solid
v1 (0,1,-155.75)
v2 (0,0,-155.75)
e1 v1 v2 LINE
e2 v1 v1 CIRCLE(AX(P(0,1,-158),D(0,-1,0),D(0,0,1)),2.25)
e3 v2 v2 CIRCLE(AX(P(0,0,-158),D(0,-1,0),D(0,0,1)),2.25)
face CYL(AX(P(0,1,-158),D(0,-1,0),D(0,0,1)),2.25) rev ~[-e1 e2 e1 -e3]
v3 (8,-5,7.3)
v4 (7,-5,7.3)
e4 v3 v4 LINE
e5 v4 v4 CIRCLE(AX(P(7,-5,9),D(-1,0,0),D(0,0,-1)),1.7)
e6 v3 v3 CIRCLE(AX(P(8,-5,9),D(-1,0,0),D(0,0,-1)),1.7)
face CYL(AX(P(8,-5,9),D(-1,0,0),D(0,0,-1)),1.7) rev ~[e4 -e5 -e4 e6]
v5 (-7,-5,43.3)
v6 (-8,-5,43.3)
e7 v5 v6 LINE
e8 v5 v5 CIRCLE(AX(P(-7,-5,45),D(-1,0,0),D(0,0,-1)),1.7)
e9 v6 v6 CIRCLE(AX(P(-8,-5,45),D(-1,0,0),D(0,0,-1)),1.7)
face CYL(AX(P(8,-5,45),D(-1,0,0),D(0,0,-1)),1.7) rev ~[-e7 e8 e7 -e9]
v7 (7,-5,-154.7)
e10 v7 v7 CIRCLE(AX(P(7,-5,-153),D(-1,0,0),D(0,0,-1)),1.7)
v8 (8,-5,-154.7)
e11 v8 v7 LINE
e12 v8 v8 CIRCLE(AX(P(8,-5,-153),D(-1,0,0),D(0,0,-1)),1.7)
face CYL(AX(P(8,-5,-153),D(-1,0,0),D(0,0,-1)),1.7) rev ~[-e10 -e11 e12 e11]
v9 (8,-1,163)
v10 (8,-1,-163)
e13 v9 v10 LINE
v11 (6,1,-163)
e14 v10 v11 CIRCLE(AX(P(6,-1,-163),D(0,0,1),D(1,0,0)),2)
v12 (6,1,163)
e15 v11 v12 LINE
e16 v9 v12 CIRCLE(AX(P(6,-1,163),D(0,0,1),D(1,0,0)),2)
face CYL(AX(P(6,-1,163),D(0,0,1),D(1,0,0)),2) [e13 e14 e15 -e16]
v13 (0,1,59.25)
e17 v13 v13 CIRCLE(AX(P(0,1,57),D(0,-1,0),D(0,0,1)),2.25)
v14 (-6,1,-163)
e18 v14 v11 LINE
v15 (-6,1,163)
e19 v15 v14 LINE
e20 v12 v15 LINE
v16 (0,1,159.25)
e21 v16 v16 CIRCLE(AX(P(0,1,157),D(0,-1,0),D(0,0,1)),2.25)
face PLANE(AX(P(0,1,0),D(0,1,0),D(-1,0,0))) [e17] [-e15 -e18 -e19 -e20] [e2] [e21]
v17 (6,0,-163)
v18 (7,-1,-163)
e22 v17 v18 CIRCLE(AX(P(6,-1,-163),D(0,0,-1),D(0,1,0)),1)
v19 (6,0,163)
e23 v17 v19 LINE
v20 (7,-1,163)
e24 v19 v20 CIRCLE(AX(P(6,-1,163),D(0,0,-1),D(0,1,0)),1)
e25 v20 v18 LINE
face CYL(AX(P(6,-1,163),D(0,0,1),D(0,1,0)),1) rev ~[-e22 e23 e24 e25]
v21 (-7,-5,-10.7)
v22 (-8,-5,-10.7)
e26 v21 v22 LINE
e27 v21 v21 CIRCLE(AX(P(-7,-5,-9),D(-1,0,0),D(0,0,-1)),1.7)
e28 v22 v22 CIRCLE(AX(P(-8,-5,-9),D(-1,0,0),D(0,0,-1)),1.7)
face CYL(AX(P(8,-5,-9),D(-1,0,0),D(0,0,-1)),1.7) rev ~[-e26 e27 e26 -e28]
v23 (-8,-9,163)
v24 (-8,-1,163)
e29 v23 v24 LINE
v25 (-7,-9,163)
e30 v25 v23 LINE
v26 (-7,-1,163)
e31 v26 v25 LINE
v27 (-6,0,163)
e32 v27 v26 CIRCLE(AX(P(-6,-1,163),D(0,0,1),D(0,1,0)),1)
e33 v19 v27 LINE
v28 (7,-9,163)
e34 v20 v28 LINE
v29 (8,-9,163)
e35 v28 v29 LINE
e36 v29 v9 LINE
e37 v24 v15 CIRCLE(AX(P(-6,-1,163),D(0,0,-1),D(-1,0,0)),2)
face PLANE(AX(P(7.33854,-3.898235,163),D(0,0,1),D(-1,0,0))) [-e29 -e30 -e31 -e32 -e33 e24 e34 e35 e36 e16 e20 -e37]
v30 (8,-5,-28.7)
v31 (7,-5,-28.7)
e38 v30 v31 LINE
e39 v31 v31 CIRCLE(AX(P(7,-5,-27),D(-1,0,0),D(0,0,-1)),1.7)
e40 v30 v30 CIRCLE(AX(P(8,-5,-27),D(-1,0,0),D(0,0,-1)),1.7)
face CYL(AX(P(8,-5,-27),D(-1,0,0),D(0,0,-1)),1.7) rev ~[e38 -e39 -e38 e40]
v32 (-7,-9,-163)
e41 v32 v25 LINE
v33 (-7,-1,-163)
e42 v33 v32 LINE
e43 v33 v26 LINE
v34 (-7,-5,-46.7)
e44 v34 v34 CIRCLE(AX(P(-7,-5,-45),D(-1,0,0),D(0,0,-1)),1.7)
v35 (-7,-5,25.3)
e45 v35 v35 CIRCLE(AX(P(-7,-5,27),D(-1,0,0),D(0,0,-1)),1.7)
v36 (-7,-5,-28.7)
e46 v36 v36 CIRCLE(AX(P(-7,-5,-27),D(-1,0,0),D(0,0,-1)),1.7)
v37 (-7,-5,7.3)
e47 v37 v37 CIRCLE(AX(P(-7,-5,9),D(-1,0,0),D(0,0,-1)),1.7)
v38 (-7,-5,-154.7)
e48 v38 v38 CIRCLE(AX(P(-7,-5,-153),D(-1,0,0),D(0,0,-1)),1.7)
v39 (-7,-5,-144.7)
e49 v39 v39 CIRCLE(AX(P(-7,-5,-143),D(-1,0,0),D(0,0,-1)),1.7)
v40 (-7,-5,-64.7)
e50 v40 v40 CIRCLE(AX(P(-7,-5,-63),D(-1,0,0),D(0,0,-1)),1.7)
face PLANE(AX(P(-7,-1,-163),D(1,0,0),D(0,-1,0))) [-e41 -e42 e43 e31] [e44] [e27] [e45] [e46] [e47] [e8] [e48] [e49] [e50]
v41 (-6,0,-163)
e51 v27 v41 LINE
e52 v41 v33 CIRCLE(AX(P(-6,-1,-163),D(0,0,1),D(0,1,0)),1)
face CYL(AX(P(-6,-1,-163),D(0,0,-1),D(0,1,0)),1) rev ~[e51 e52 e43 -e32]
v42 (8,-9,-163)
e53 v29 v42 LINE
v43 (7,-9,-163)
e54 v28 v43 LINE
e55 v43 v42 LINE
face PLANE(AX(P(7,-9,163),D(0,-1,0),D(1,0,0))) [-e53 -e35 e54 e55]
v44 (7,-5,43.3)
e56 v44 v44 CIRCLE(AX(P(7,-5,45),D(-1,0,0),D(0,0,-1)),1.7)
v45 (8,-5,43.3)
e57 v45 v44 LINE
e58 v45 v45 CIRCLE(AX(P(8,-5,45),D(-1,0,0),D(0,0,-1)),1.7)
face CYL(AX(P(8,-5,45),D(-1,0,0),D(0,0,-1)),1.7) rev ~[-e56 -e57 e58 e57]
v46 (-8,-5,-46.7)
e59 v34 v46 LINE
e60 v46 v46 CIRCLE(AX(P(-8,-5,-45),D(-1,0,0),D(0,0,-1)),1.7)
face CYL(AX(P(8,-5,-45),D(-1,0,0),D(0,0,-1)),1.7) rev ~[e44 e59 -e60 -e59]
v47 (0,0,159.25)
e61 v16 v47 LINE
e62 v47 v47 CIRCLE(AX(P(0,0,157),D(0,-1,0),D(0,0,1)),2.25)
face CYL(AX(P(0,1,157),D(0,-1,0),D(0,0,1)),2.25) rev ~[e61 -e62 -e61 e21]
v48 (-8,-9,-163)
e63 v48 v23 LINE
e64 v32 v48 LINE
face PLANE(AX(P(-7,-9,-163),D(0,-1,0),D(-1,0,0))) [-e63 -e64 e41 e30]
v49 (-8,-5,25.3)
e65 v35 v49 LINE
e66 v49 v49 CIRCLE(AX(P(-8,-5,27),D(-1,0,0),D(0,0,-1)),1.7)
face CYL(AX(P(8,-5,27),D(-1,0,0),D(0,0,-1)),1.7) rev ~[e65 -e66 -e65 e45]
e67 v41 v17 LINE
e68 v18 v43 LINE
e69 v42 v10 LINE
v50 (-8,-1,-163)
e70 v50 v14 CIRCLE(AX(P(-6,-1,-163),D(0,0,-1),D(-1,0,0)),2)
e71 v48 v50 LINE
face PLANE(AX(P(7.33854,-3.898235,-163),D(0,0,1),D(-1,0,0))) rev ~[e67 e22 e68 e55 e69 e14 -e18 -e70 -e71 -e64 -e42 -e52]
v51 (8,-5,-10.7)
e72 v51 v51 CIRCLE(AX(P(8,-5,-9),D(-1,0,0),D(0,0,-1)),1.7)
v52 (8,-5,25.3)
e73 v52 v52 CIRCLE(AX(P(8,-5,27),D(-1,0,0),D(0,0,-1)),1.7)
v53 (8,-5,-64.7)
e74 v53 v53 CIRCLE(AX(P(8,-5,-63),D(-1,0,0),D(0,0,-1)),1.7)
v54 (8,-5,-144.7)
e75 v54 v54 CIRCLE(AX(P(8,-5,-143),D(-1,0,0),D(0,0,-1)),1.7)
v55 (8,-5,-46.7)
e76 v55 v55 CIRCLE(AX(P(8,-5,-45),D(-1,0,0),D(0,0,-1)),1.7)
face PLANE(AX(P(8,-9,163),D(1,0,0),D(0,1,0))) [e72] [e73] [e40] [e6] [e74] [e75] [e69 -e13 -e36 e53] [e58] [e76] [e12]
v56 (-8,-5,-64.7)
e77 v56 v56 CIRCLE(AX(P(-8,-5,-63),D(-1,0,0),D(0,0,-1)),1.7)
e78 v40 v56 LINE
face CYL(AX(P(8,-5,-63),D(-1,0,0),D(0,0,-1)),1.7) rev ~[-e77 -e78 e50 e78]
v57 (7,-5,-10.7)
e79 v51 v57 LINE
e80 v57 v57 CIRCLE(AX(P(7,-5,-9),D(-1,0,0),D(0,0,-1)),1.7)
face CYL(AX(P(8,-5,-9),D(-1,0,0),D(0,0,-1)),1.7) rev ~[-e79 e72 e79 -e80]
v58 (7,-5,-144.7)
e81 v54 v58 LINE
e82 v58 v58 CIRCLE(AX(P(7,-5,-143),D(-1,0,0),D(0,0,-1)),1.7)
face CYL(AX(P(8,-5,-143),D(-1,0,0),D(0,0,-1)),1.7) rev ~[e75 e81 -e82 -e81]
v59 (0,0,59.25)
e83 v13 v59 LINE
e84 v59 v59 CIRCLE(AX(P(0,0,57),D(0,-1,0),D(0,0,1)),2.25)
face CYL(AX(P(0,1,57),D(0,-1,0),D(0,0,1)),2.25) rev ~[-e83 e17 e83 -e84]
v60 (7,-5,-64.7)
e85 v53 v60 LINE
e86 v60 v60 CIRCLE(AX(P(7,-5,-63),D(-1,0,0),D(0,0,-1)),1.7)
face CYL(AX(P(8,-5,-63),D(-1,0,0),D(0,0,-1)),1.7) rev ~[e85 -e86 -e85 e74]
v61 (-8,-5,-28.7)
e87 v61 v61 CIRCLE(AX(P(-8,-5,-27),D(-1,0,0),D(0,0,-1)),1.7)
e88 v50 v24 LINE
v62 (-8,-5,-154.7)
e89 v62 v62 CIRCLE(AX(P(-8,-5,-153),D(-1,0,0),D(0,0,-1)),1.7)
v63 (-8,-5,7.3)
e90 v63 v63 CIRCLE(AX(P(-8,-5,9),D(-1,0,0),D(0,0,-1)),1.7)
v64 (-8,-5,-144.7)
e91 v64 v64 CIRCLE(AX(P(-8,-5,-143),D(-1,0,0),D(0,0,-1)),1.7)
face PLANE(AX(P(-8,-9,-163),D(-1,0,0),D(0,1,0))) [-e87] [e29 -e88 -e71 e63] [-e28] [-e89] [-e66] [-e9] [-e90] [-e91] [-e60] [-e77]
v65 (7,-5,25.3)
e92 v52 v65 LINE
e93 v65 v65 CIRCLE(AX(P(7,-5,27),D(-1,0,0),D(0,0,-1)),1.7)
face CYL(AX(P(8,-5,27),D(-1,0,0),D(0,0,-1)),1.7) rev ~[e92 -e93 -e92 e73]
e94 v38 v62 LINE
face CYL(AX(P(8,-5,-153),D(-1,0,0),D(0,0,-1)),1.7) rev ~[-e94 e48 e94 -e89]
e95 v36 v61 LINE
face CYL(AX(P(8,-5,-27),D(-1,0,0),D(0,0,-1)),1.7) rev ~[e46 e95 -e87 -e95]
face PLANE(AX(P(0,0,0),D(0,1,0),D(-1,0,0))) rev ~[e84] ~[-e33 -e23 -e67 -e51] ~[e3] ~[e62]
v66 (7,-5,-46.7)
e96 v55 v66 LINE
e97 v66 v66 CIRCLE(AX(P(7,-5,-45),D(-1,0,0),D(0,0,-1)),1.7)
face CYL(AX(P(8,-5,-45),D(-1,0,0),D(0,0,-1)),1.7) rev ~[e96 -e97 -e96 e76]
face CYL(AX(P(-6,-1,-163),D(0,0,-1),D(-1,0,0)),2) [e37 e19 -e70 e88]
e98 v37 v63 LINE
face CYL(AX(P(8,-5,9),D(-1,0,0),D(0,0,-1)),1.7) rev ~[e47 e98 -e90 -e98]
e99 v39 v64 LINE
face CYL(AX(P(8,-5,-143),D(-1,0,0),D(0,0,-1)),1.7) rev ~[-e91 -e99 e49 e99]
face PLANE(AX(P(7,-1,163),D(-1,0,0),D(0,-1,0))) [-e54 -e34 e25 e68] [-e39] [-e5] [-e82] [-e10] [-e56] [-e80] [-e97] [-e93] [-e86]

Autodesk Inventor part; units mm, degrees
ref_plane "YZ Plane" through (0, 0, 0) normal (1, 0, 0) x (0, 1, 0)
ref_plane "XZ Plane" through (0, 0, 0) normal (0, 1, 0) x (-1, 0, 0)
ref_plane "XY Plane" through (0, 0, 0) normal (0, 0, 1) x (1, 0, 0)
sketch "Esquisse4" plane through (0, 0, 0) normal (0, 1, 0) x (-1, 0, 0)
  line L0 (-8, 163) -> (8, 163)
  line L1 (8, 163) -> (8, -163)
  line L2 (8, -163) -> (-8, -163)
  line L3 (-8, -163) -> (-8, 163)
  line L4 (-8, 163) -> (8, -163) construction
  line L5 (8, 163) -> (-8, -163) construction
  point P0 (0, 0)
  dimension "d26" = 16
  dimension "d27" = 326
extrude "Plaque3" add sketch "Esquisse4" along normal blind 1
sketch "Esquisse5" plane through (7, 1, 163) normal (1, 0, 0) x (0, 1, 0)
  line L0 (0, -326) -> (0, 0)
  line L1 (0, 0) -> (-10, 0)
  line L2 (-10, 0) -> (-10, -326)
  line L3 (-10, -326) -> (0, -326)
edge flange "Bord tombé2" height 10 angle 90 thickness 1 bend radius 1 thickness toward (1, 0, 0) relief tear relief width 1 relief depth 0.5 corner gap 1 corner form 0 edges at (8, 0, 0) (-8, 0, 0) wall of the first edge with corners at (7, 1, -163) (7, 1, 163) (7, -9, 163) (7, -9, -163)
bend "Pli2"
corner "Coin2"
sketch "Esquisse6" plane through (0, 1, 0) normal (0, 1, 0) x (1, 0, 0)
  line L0 (-6, 163) -> (6, 163) projected
  point P0 (0, 0)
  point P1 (0, 158)
  point P2 (0, 163)
  dimension "d39" = 5
hole "Perçage2" at (0, 1, -158) direction (0, -1, 0) diameter 4.5 depth 1 clearance for "Vis d'assemblage à six pans creux ISO 4762" size "M4" standard "ISO"
sketch "Esquisse7" plane through (0, 1, 0) normal (0, 1, 0) x (1, 0, 0)
  line L0 (-6, 163) -> (6, 163) projected
  point P0 (0, 0)
  point P1 (0, -57)
  point P2 (0, -157)
  dimension "d50" = 220
  dimension "d51" = 100
hole "Perçage3" at (0, 1, 57) at (0, 1, 157) direction (0, -1, 0) diameter 4.5 depth 1 clearance for "Vis d'assemblage à six pans creux ISO 4762" size "M4" standard "ISO"
sketch "Esquisse8" plane through (8, -9, 163) normal (1, 0, 0) x (0, 0, -1)
  line L0 (326, 8) -> (0, 8) projected
  line L1 (0, 0) -> (0, 8) projected
  line L2 (326, 0) -> (0, 0) projected
  line L3 (326, 8) -> (326, 0) projected
  line L4 (326, 8) -> (326, 0) projected
  point P0 (163, 9)
  point P1 (326, 4)
  point P2 (326, 4)
  point P3 (316, 4)
  point P4 (326, 4)
  point P5 (306, 4)
  dimension "d60" = 10
  dimension "d71" = 10
hole "Perçage4" at (8, -5, -153) at (8, -5, -143) direction (-1, 0, 0) diameter 3.4 depth 16 clearance for "Vis d'assemblage à six pans creux ISO 4762" size "M3" standard "ISO"
sketch "Esquisse9" plane through (8, -9, 163) normal (1, 0, 0) x (0, 0, -1)
  line L0 (326, 8) -> (326, 0) projected
  point P0 (163, 9)
  point P1 (226, 4)
  point P2 (326, 4)
  dimension "d72" = 100
hole "Perçage5" at (8, -5, -63) direction (-1, 0, 0) diameter 3.4 depth 16 clearance for "Vis d'assemblage à six pans creux ISO 4762" size "M3" standard "ISO"
pattern_linear "Réseau rectangulaire2" count 7 spacing 18 along (0, 0, 1) of "Perçage5"
equation "\"d45\" = Epaisseur"
equation "\"d57\" = Epaisseur"
equation "\"d66\" = Epaisseur"
equation "\"d78\" = Epaisseur"
equation "\"d28\" = Epaisseur"
equation "\"d29\" = LargeurGrugeage"
equation "\"d30\" = ProfondeurGrugeage"
equation "\"d31\" = RestesMinimum"
equation "\"d32\" = Rayondetransition"
equation "\"d35\" = RayonPli"
equation "\"d36\" = TailleGrugeage"
equation "\"d37\" = TailleJeu"
equation "\"d38\" = TailleRayonJacobi"
equation "\"RayonPli\" = Epaisseur"
equation "\"LargeurGrugeage\" = Epaisseur"
equation "\"ProfondeurGrugeage\" = 0.5 * Epaisseur"
equation "\"TailleGrugeage\" = 4 * Epaisseur"
equation "\"RestesMinimum\" = 2 * Epaisseur"
equation "\"Rayondetransition\" = RayonPli"
equation "\"TailleRayonJacobi\" = RayonPli"
equation "\"TailleJeu\" = Epaisseur"
equation "\"Epaisseur\" = 1"
properties part number "support_principal"
